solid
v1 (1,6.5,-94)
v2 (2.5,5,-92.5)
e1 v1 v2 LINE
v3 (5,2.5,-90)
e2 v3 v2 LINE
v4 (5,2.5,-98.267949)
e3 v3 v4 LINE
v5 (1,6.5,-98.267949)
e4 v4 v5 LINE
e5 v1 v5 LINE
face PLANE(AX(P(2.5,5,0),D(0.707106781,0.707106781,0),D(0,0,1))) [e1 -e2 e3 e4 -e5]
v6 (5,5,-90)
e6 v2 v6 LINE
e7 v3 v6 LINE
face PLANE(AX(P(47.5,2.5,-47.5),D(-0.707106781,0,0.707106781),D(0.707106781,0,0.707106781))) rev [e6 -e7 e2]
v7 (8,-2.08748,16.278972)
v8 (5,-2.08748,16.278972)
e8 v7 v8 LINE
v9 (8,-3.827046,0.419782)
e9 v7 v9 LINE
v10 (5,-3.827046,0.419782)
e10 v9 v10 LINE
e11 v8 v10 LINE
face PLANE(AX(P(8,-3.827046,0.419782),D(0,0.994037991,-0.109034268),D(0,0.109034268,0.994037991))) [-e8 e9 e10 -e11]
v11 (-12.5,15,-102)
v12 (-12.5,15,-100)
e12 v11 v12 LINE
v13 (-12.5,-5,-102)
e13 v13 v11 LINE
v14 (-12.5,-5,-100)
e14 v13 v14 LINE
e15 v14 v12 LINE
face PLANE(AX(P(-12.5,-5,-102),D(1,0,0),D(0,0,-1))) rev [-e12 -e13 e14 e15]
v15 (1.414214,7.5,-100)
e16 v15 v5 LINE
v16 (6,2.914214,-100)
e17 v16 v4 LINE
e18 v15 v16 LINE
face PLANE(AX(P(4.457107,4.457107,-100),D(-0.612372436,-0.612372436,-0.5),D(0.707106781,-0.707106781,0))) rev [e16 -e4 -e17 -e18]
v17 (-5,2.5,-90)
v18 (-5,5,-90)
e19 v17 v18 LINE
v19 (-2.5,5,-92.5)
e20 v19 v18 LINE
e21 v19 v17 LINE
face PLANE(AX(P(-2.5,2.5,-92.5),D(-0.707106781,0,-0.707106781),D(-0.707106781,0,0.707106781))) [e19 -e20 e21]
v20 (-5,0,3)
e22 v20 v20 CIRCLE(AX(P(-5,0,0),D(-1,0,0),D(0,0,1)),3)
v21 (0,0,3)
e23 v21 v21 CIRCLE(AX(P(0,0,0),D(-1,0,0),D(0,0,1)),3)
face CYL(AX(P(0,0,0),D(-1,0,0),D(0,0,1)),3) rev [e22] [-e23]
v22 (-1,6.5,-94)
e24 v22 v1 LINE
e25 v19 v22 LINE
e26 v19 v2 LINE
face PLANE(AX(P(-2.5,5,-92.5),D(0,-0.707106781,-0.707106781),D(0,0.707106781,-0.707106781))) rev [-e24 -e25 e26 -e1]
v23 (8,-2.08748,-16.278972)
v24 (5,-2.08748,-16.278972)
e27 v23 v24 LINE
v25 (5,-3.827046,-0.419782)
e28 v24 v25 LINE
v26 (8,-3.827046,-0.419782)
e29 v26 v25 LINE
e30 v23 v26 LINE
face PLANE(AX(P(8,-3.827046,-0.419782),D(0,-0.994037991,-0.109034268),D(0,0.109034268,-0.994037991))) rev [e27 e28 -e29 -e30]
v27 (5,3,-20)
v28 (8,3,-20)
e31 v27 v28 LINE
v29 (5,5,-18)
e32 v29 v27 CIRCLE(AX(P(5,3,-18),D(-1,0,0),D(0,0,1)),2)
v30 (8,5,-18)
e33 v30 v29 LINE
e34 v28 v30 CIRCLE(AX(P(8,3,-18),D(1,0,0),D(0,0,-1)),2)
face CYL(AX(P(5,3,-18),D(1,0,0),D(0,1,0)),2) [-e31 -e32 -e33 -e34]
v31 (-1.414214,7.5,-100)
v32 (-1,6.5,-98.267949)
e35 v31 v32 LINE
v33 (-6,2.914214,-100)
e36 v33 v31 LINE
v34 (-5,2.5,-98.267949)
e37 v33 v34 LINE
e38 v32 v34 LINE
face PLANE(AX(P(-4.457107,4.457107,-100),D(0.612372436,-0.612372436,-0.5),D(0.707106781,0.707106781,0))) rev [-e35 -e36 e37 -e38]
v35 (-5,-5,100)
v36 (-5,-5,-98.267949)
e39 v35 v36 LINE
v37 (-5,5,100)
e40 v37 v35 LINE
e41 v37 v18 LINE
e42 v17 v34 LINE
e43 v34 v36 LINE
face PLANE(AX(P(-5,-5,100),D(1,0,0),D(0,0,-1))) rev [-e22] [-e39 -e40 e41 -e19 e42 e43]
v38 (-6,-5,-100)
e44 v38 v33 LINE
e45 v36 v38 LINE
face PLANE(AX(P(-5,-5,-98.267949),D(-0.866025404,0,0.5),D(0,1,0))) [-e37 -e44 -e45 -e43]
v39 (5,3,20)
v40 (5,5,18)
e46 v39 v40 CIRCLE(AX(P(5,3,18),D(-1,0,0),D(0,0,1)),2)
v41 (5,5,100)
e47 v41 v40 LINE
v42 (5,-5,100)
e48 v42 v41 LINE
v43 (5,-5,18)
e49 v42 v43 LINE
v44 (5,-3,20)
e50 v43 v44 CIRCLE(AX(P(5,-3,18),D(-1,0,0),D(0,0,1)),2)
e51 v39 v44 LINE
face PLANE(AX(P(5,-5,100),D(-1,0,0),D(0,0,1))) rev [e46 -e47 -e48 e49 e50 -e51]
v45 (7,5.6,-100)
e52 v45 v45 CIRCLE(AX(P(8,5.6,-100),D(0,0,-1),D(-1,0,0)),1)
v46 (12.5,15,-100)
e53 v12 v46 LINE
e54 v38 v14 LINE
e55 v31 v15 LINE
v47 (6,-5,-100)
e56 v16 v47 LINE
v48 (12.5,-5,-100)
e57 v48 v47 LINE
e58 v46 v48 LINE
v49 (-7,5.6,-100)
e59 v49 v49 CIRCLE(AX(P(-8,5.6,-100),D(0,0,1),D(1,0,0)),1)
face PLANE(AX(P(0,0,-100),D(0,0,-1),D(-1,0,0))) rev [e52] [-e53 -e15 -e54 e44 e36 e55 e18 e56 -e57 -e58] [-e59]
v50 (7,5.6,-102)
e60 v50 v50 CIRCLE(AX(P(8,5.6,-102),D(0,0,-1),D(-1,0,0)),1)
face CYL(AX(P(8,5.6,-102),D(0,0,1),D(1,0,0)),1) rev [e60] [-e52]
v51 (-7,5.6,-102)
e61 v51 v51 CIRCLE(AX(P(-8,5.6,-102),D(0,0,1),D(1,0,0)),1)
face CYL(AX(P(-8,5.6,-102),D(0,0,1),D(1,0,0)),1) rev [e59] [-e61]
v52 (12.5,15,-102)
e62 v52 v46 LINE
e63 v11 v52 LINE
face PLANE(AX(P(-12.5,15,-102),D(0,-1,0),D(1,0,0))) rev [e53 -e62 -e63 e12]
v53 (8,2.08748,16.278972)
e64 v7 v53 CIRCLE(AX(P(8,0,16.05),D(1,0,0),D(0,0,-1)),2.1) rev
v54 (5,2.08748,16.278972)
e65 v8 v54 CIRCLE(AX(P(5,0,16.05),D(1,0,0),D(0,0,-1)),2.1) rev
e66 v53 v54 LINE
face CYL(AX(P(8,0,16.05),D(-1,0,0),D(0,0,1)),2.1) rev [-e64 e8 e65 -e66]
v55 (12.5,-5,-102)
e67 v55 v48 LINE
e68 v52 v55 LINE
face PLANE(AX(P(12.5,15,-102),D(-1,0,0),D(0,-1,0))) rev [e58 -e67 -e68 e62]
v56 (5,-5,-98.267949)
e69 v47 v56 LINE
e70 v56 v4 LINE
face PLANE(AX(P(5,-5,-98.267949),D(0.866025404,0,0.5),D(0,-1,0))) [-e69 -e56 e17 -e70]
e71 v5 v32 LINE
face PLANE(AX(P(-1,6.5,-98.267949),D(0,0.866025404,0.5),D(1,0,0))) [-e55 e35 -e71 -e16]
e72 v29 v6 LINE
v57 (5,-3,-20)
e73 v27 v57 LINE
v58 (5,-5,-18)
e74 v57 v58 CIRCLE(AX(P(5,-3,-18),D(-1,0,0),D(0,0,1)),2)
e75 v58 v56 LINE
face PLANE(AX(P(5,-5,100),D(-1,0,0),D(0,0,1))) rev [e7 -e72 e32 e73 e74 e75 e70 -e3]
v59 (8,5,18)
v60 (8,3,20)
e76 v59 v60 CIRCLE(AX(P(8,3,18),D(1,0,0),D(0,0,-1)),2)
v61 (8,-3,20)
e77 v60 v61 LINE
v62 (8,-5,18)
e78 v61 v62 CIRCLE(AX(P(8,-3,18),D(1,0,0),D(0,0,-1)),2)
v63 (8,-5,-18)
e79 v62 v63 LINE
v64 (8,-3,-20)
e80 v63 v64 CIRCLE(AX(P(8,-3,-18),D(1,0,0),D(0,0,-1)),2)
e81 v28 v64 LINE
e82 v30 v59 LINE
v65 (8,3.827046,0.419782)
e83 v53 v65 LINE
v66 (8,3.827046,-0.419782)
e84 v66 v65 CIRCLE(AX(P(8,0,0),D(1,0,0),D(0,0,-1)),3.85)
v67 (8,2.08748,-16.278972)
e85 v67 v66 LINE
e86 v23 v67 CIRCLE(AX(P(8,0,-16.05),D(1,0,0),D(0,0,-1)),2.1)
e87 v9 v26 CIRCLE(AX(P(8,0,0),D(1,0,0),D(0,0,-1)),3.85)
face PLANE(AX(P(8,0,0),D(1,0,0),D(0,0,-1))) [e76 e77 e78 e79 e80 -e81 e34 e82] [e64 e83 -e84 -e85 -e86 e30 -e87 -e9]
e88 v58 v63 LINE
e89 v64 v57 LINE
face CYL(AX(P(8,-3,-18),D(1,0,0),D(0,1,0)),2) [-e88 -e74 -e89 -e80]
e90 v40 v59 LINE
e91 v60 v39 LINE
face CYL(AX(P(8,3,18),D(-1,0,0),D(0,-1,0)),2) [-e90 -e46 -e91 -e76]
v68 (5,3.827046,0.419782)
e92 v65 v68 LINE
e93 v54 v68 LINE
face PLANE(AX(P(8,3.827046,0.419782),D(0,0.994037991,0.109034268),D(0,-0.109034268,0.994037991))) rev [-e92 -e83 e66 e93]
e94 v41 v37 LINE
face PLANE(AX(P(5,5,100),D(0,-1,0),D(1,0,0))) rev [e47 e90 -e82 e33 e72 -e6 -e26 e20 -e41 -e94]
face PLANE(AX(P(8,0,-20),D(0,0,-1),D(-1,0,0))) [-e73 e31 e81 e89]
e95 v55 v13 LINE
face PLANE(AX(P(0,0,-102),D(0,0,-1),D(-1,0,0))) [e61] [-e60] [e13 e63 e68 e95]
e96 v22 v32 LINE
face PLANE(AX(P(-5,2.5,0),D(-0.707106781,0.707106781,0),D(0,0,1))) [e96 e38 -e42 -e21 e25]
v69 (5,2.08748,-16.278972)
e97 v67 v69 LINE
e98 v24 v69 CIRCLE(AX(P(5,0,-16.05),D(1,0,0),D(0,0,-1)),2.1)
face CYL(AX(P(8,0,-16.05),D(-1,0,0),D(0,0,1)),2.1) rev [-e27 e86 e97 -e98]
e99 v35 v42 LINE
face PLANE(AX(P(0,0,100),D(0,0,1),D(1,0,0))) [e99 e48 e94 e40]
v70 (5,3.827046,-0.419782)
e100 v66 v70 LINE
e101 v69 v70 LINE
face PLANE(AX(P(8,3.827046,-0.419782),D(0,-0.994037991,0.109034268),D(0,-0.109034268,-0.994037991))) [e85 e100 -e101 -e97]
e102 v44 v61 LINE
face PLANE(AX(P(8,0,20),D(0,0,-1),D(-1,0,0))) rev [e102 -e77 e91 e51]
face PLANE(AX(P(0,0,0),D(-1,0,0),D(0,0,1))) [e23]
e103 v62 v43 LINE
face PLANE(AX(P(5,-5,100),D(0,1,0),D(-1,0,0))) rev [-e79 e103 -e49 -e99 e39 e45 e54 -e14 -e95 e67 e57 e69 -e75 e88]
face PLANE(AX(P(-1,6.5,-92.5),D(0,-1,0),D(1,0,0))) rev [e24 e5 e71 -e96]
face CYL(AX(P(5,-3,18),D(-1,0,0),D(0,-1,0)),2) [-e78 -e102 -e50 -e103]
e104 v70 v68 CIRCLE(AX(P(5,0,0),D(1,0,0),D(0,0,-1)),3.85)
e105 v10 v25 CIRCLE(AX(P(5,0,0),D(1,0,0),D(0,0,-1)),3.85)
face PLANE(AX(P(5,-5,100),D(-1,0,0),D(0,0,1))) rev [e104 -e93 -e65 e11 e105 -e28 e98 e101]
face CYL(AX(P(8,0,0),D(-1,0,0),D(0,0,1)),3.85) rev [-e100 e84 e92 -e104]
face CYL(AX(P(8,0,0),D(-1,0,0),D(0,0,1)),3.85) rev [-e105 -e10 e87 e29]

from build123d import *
from build123d.topology import SkipClean

# Parameters (mm, degrees)
SKETCH1_W           = 10
SKETCH1_H           = 10
BOSS_EXTRUDE1_DEPTH = 100
SKETCH2_W           = 25
SKETCH2_H           = 20
SKETCH2_R           = 1
BOSS_EXTRUDE2_DEPTH = 2
CUT_EXTRUDE2_DEPTH  = 2.5
CHAMFER2_SIZE       = 2.5
BOSS_EXTRUDE3_DEPTH = 7.5
CUT_EXTRUDE3_DEPTH  = 7.5
SKETCH8_W           = 40
SKETCH8_H           = 10
BOSS_EXTRUDE4_DEPTH = 3
FILLET1_R           = 2
SKETCH9_R           = 3
CUT_EXTRUDE4_DEPTH  = 5


with BuildPart() as part:
    # Sketch1 → Boss-Extrude1 (new, symmetric)
    with BuildSketch(Plane.XY):
        Rectangle(SKETCH1_W, SKETCH1_H)
    extrude(amount=BOSS_EXTRUDE1_DEPTH, both=True)

    # Sketch2 → Boss-Extrude2 (add)
    with BuildSketch(Plane(origin=(0, 0, -100), x_dir=(-1, 0, 0), z_dir=(0, 0, -1))):
        with Locations((0, 5)):
            Rectangle(SKETCH2_W, SKETCH2_H)
        with Locations((-8, 5.6)):
            Circle(SKETCH2_R, mode=Mode.SUBTRACT)
        with Locations(Location((8, 5.6, 0), (0, 0, 180))):
            Circle(SKETCH2_R, mode=Mode.SUBTRACT)
    extrude(amount=BOSS_EXTRUDE2_DEPTH)

    # Sketch4 → Cut-Extrude2 (cut)
    with BuildSketch(Plane(origin=(0, 5, 0), x_dir=(1, 0, 0), z_dir=(0, 1, 0))):
        Polygon((5, 100), (2.5, 100), (2.5, 92.5), (5, 90), (5, 92.5), align=None)
        Polygon((-5, 90), (-5, 92.5), (-5, 100), (-2.5, 100), (-2.5, 92.5), align=None)
    extrude(amount=-CUT_EXTRUDE2_DEPTH, mode=Mode.SUBTRACT)

    # Chamfer2
    chamfer2_edges = [part.edges().sort_by_distance(p)[0] for p in [
        (-2.5, 2.5, -96.25),
        (2.5, 2.5, -96.25),
    ]]
    chamfer(chamfer2_edges, length=CHAMFER2_SIZE - 0.0001)  # a hair under: the kernel refuses the full size

    # Sketch5 → Boss-Extrude3 (add)
    with SkipClean():  # the faces are left unmerged after this step: merging them gives an invalid solid
        with BuildSketch(Plane.XY.offset(-100)):
            Polygon((-2.5, 5), (-1, 6.5), (1, 6.5), (2.5, 5), align=None)
        extrude(amount=BOSS_EXTRUDE3_DEPTH)

    # Sketch7 → Cut-Extrude3 (cut)
    with SkipClean():  # the faces are left unmerged after this step: merging them gives an invalid solid
        with BuildSketch(Plane(origin=(5, 0, 0), x_dir=(0, 0, -1), z_dir=(1, 0, 0))):
            Polygon((92.5, 5), (94, 6.5), (92.5, 6.5), align=None)
        extrude(amount=-CUT_EXTRUDE3_DEPTH, mode=Mode.SUBTRACT)

    # Chamfer3: read off the stored shape, not the designer's step
    # Chamfer3: loft between two sections, ruled curve by curve
    with SkipClean():  # the faces are left unmerged after this step: merging them gives an invalid solid
        chamfer3_from = [
            Edge.make_line((-5, -5, -98.267949192), (-5, 2.5, -98.267949192)),
            Edge.make_line((-5, 2.5, -98.267949192), (-1, 6.5, -98.267949192)),
            Edge.make_line((-1, 6.5, -98.267949192), (1, 6.5, -98.267949192)),
            Edge.make_line((1, 6.5, -98.267949192), (5, 2.5, -98.267949192)),
            Edge.make_line((5, -5, -98.267949192), (5, 2.5, -98.267949192)),
            Edge.make_line((5, -5, -98.267949192), (-5, -5, -98.267949192)),
        ]
        chamfer3_to = [
            Edge.make_line((-6, -5, -100), (-6, 2.914213562, -100)),
            Edge.make_line((-6, 2.914213562, -100), (-1.414213562, 7.5, -100)),
            Edge.make_line((-1.414213562, 7.5, -100), (1.414213562, 7.5, -100)),
            Edge.make_line((1.414213562, 7.5, -100), (6, 2.914213562, -100)),
            Edge.make_line((6, -5, -100), (6, 2.914213562, -100)),
            Edge.make_line((6, -5, -100), (-6, -5, -100)),
        ]
        chamfer3 = Solid(Shell([*[Face.make_surface_from_curves(chamfer3_from[k], chamfer3_to[k]) for k in range(6)], Face(Wire(chamfer3_from)), Face(Wire(chamfer3_to))]))
        add(chamfer3)

    # Sketch8 → Boss-Extrude4 (add)
    with SkipClean():  # the faces are left unmerged after this step: merging them gives an invalid solid
        with BuildSketch(Plane(origin=(5, 0, 0), x_dir=(0, 0, -1), z_dir=(1, 0, 0))):
            Rectangle(SKETCH8_W, SKETCH8_H)
            with BuildLine():
                Line((0.419781931, 3.827046267), (16.278971963, 2.087479782))
                ThreePointArc((16.278971963, 2.087479782), (18.15, 0), (16.278971963, -2.087479782))
                Line((16.278971963, -2.087479782), (0.419781931, -3.827046267))
                ThreePointArc((0.419781931, -3.827046267), (0, -3.85), (-0.419781931, -3.827046267))
                Line((-0.419781931, -3.827046267), (-16.278971963, -2.087479782))
                ThreePointArc((-16.278971963, -2.087479782), (-18.15, 0), (-16.278971963, 2.087479782))
                Line((-16.278971963, 2.087479782), (-0.419781931, 3.827046267))
                ThreePointArc((-0.419781931, 3.827046267), (0, 3.85), (0.419781931, 3.827046267))
            make_face(mode=Mode.SUBTRACT)
        extrude(amount=BOSS_EXTRUDE4_DEPTH)

    # Fillet1
    # the kernel refuses this fillet: 2 mm, written as the material it takes off along each edge
    with BuildSketch(Plane(origin=(5, 5, -20), x_dir=(0, -1, 0), z_dir=(1, 0, 0)), Plane(origin=(5, -5, -20), x_dir=(0, 0, 1), z_dir=(1, 0, 0))) as fillet1_piece_1:
        with BuildLine():
            CenterArc((FILLET1_R, -FILLET1_R), FILLET1_R, 90, 90)
            Line((0, -FILLET1_R), (0, 0))
            Line((0, 0), (FILLET1_R, 0))
        make_face()
    extrude(amount=8, mode=Mode.SUBTRACT)
    with BuildSketch(Plane(origin=(5, 5, 20), x_dir=(0, -1, 0), z_dir=(1, 0, 0)), Plane(origin=(5, -5, 20), x_dir=(0, 0, -1), z_dir=(1, 0, 0))) as fillet1_piece_2:
        with BuildLine():
            CenterArc((FILLET1_R, FILLET1_R), FILLET1_R, 180, 90)
            Line((0, FILLET1_R), (0, 0))
            Line((0, 0), (FILLET1_R, 0))
        make_face()
    extrude(amount=8, mode=Mode.SUBTRACT)

    # Sketch9 → Cut-Extrude4 (cut)
    with SkipClean():  # the faces are left unmerged after this step: merging them gives an invalid solid
        with BuildSketch(Plane.ZY.offset(5)):
            Circle(SKETCH9_R)
        extrude(amount=-CUT_EXTRUDE4_DEPTH, mode=Mode.SUBTRACT)


solid = part.part
